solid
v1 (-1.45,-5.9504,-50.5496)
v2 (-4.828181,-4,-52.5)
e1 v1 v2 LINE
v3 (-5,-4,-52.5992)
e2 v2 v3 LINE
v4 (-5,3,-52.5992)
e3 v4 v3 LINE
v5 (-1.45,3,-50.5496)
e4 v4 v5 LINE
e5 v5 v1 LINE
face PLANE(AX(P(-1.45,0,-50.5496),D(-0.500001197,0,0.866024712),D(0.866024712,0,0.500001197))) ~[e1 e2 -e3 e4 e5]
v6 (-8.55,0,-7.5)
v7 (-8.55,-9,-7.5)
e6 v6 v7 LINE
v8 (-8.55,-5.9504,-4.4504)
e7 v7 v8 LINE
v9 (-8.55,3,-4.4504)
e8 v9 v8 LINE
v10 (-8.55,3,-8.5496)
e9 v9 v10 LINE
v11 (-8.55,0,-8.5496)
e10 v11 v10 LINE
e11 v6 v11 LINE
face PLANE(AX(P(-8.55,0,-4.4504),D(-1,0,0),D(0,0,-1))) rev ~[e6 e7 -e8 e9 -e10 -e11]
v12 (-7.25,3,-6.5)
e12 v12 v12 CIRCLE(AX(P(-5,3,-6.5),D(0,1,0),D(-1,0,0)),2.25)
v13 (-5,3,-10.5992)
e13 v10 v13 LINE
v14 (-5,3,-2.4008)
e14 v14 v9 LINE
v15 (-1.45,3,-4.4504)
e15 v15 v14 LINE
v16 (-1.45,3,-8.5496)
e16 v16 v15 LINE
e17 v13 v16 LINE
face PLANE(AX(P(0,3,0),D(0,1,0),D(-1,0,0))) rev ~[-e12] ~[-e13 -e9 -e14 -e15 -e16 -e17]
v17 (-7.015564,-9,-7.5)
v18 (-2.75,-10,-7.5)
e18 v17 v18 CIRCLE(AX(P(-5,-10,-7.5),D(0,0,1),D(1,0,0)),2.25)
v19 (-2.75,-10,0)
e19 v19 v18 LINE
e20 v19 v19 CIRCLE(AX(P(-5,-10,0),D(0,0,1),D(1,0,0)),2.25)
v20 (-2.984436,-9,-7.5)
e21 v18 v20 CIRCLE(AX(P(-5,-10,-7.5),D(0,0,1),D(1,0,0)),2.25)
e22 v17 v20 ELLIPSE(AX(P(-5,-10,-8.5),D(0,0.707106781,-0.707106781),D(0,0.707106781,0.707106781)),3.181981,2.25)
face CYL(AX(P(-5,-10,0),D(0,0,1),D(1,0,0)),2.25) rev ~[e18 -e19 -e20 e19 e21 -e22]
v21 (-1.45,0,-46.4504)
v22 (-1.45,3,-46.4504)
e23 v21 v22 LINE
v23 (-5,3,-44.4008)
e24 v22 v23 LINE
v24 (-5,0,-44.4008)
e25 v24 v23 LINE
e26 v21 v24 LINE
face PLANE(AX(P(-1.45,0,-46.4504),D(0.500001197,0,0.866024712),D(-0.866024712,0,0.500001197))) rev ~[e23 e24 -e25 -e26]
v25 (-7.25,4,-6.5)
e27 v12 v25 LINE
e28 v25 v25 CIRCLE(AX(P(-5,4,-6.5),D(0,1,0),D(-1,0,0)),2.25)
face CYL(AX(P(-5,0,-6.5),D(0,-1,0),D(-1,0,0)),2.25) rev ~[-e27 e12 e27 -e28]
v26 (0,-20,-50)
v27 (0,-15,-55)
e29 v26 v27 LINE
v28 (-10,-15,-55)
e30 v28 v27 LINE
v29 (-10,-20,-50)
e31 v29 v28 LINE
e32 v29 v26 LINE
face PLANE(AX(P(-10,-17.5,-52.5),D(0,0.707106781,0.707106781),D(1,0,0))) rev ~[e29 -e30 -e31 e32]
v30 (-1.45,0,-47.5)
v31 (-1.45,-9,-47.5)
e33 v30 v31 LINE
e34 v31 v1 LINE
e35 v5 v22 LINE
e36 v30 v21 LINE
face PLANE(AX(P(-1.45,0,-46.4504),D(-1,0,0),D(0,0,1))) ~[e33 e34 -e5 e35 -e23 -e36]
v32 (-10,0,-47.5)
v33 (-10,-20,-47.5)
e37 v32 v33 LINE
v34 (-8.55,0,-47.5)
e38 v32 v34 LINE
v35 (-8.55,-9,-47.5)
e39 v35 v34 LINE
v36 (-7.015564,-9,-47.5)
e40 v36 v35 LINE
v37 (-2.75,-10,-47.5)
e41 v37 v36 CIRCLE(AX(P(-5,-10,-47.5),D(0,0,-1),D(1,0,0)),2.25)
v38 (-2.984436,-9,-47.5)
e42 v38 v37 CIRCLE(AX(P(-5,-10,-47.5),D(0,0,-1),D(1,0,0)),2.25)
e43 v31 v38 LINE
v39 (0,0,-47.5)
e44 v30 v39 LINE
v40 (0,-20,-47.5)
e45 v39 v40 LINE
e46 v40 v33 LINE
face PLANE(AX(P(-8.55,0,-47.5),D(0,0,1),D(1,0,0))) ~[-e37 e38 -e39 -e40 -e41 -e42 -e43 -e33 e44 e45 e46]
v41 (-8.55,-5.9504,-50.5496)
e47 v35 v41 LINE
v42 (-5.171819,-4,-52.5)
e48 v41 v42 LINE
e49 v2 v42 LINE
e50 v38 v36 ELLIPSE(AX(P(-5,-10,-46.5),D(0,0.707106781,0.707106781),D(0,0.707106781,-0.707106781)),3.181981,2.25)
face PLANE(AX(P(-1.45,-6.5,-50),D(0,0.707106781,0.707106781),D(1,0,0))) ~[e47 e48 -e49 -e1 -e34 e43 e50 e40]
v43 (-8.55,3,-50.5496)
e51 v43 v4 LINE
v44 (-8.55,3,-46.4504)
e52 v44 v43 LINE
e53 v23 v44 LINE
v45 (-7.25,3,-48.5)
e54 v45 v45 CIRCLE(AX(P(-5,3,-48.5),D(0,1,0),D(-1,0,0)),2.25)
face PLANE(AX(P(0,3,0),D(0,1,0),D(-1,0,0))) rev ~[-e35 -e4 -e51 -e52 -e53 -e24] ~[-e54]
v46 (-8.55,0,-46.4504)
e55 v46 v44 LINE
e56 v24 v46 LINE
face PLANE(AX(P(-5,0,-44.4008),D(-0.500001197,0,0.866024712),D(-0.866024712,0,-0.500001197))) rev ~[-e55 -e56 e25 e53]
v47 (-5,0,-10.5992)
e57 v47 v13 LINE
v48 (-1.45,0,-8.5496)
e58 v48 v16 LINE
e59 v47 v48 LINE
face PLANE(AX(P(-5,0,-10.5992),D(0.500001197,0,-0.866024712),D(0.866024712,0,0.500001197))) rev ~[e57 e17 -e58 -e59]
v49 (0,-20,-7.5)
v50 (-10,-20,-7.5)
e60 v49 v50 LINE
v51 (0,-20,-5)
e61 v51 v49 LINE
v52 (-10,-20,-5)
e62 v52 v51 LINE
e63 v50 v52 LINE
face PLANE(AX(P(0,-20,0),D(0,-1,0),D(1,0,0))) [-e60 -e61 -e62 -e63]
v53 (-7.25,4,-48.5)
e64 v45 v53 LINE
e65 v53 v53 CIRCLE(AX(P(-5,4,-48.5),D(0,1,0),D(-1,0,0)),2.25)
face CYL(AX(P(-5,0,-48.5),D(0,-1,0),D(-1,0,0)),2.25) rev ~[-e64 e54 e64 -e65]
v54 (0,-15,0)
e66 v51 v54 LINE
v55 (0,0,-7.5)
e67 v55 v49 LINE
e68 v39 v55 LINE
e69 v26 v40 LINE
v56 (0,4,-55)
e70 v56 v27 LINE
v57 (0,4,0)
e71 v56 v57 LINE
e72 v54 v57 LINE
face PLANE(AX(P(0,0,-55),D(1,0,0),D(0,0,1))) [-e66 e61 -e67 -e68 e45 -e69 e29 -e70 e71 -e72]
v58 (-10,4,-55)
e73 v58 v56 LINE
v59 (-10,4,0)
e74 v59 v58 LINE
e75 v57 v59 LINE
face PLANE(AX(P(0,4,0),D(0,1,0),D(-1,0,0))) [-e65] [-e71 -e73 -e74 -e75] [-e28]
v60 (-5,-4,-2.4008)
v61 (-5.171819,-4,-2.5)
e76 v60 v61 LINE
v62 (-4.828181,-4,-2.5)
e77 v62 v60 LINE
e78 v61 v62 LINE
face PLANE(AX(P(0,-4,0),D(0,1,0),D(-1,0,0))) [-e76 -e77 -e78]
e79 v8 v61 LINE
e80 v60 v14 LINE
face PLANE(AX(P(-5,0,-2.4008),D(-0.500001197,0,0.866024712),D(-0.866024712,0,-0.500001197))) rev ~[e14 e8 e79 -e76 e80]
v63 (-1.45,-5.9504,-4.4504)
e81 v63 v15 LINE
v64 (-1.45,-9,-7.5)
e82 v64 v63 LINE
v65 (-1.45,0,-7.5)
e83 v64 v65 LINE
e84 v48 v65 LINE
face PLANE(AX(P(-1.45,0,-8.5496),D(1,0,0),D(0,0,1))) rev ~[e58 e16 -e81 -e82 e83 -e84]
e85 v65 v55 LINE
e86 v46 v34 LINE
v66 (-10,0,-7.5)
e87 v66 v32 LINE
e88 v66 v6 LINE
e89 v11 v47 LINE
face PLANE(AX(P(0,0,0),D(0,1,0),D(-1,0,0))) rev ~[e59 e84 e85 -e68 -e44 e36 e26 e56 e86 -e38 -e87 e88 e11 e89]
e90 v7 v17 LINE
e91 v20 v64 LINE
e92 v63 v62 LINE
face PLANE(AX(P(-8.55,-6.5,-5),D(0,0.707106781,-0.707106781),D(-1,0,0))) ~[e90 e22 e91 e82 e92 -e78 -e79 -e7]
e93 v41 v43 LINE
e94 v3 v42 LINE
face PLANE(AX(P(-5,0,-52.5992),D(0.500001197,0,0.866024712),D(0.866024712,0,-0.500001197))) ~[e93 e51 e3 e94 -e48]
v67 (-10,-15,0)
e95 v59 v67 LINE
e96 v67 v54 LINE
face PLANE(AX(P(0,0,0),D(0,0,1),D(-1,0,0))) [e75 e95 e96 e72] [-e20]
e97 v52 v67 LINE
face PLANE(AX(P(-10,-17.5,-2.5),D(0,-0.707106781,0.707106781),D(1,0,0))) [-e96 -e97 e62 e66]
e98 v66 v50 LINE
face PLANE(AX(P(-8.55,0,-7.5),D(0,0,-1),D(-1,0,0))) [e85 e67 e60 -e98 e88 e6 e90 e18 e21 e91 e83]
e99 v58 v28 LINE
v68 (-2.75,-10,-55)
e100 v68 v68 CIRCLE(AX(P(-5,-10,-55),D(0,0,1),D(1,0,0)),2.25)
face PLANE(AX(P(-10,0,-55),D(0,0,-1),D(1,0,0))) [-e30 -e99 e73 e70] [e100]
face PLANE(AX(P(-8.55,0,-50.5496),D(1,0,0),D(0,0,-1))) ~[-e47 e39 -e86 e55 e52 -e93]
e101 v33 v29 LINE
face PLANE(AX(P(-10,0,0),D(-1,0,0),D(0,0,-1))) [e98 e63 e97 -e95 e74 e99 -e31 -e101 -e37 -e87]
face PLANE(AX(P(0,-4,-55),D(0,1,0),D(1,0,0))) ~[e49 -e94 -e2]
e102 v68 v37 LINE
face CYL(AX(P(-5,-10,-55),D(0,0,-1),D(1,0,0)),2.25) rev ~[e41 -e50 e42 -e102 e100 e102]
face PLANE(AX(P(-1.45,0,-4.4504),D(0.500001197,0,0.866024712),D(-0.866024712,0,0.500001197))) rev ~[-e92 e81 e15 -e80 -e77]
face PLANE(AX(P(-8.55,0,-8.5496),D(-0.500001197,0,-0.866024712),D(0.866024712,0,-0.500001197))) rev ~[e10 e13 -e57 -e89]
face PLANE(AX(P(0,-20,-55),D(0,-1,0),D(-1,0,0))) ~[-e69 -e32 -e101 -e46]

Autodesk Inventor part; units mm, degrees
ref_plane "YZ Plane" through (0, 0, 0) normal (1, 0, 0) x (0, 1, 0)
ref_plane "XZ Plane" through (0, 0, 0) normal (0, 1, 0) x (-1, 0, 0)
sketch "Sketch1" plane through (0, 0, 0) normal (0, 1, 0) x (-1, 0, 0)
  line L0 (0, 0) -> (10, 0)
  line L1 (10, 0) -> (10, -55)
  line L2 (10, -55) -> (0, -55)
  line L3 (0, -55) -> (0, 0)
  line L4 (5, 0) -> (5, -6.5) construction
  line L5 (5, -6.5) -> (5, -48.5) construction
  circle A0 centre (5, -6.5) radius 2.25
  circle A1 centre (5, -48.5) radius 2.25
  line L6 (5, -27.5) -> (10, -27.5) construction
  line L7 (8.55, -4.4504) -> (8.55, -8.5496)
  line L8 (8.55, -8.5496) -> (5, -10.5992)
  line L9 (5, -10.5992) -> (1.45, -8.5496)
  line L10 (1.45, -8.5496) -> (1.45, -4.4504)
  line L11 (1.45, -4.4504) -> (5, -2.4008)
  line L12 (5, -2.4008) -> (8.55, -4.4504)
  line L13 (5, -44.4008) -> (8.55, -46.4504)
  line L14 (8.55, -46.4504) -> (8.55, -50.5496)
  line L15 (8.55, -50.5496) -> (5, -52.5992)
  line L16 (5, -52.5992) -> (1.45, -50.5496)
  line L17 (1.45, -50.5496) -> (1.45, -46.4504)
  line L18 (1.45, -46.4504) -> (5, -44.4008)
  line L19 (10, -27.5) -> (15, -27.5) construction
  line L20 (15, -27.5) -> (15, -17.5) construction
  line L21 (15, -27.5) -> (15, -37.5) construction
  circle A2 centre (15, -17.5) radius 2.25
  circle A3 centre (15, -37.5) radius 2.25
  line L22 (20, -17.5) -> (20, -37.5)
  line L23 (15, -27.5) -> (20, -27.5) construction
  line L24 (20, -17.5) -> (10, 0)
  line L25 (20, -37.5) -> (10, -55)
  circle A4 centre (15, -17.5) radius 4
  circle A5 centre (15, -37.5) radius 4
  line L26 (0, -27.5) -> (-5, -27.5) construction
  line L27 (-5, -27.5) -> (-5, -17.5) construction
  line L28 (-5, -27.5) -> (-5, -37.5) construction
  circle A6 centre (-5, -17.5) radius 2.25
  circle A7 centre (-5, -37.5) radius 2.25
  line L29 (-10, -17.5) -> (-10, -37.5)
  line L30 (-5, -27.5) -> (-10, -27.5) construction
  line L31 (-10, -17.5) -> (0, 0)
  line L32 (-10, -37.5) -> (0, -55)
  circle A8 centre (-5, -17.5) radius 4
  circle A9 centre (-5, -37.5) radius 4
  dimension "d2" = 10
  dimension "d3" = 55
  dimension "d4" = 7.1
  dimension "d5" = 7.1
  dimension "d6" = 42
  dimension "d7" = 4.5
  dimension "d12" = 20
  dimension "d13" = 4.5
  dimension "d15" = 20
  dimension "d16" = 8
  dimension "d17" = 8
  dimension "d18" = 10
extrude "Extrusion1" add sketch "Sketch1" along normal blind 4 contours L0 L1 L2 L3 | L7 L8 L9 L10 L11 L12 | L13 L14 L15 L16 L17 L18
extrude "Extrusion2" cut sketch "Sketch1" along normal blind 3 contours L7 L8 L9 L10 L11 L12 | L13 L14 L15 L16 L17 L18
ref_plane "Work Plane1" through (0, 0, -27.5) normal (0, 0, -1) x (-1, 0, 0)
sketch "Sketch2" plane through (0, 0, 0) normal (0, -1, 0) x (1, 0, 0)
  line L0 (-8.55, -4.4504) -> (-5, -2.4008) projected
  line L1 (-5, -2.4008) -> (-1.45, -4.4504) projected
  line L2 (-1.45, -4.4504) -> (-1.45, -8.5496) projected
  line L3 (-1.45, -8.5496) -> (-5, -10.5992) projected
  line L4 (-5, -10.5992) -> (-8.55, -8.5496) projected
  line L5 (-8.55, -8.5496) -> (-8.55, -4.4504) projected
  line L6 (-5, -44.4008) -> (-1.45, -46.4504) projected
  line L7 (-1.45, -46.4504) -> (-1.45, -50.5496) projected
  line L8 (-1.45, -50.5496) -> (-5, -52.5992) projected
  line L9 (-5, -52.5992) -> (-8.55, -50.5496) projected
  line L10 (-8.55, -50.5496) -> (-8.55, -46.4504) projected
  line L11 (-8.55, -46.4504) -> (-5, -44.4008) projected
  line L12 (0, -55) -> (-10, -55) projected
  line L13 (-10, 0) -> (0, 0) projected
  line L14 (4.2857, -7.5) -> (-14.2857, -7.5)
  line L15 (10, -27.5) -> (-20, -27.5) construction
  line L16 (0, 0) -> (0, -55) projected
  line L17 (-10, -55) -> (-10, 0) projected
  point P0 (-10, -7.5)
  point P1 (0, -7.5)
  dimension "d19" = 20
extrude "Extrusion3" add sketch "Sketch2" along normal blind 20 contours L5 L14 L17 L13 L16 L2 L1 L0 | L0 L1 L2 L14 L5
extrude "Extrusion4" cut sketch "Sketch1" against normal blind 4 contours A0 | L7 L8 L9 L10 L11 L12
chamfer "Chamfer1" distance 5 angle 45 1 edges at (-5, -4, -7.5)
sketch "Sketch3" plane through (-10, 4, 0) normal (0, 0, 1) x (1, 0, 0)
  line L0 (10, -24) -> (10, 0) projected
  line L1 (0, 0) -> (10, 0) projected
  line L2 (0, -24) -> (0, 0) projected
  line L3 (10, -24) -> (0, -24) projected
  line L4 (5, -24) -> (5, -14) construction
  circle A0 centre (5, -14) radius 2.25
  line L5 (10, -4) -> (0, -4)
  dimension "d27" = 10
  dimension "d28" = 4.5
extrude "Extrusion5" cut sketch "Sketch3" against normal through all contours A0
chamfer "Chamfer2" distance 5 angle 45 1 edges at (-5, -20, 0)
mirror "Mirror1" about plane through (0, 0, -27.5) normal (0, 0, -1) of "Extrusion5", "Extrusion3", "Extrusion4", "Chamfer1", "Chamfer2"
equation "\"d5\" = d4"
equation "\"d17\" = d16"
properties part number "Thread Bearing Bracket"
